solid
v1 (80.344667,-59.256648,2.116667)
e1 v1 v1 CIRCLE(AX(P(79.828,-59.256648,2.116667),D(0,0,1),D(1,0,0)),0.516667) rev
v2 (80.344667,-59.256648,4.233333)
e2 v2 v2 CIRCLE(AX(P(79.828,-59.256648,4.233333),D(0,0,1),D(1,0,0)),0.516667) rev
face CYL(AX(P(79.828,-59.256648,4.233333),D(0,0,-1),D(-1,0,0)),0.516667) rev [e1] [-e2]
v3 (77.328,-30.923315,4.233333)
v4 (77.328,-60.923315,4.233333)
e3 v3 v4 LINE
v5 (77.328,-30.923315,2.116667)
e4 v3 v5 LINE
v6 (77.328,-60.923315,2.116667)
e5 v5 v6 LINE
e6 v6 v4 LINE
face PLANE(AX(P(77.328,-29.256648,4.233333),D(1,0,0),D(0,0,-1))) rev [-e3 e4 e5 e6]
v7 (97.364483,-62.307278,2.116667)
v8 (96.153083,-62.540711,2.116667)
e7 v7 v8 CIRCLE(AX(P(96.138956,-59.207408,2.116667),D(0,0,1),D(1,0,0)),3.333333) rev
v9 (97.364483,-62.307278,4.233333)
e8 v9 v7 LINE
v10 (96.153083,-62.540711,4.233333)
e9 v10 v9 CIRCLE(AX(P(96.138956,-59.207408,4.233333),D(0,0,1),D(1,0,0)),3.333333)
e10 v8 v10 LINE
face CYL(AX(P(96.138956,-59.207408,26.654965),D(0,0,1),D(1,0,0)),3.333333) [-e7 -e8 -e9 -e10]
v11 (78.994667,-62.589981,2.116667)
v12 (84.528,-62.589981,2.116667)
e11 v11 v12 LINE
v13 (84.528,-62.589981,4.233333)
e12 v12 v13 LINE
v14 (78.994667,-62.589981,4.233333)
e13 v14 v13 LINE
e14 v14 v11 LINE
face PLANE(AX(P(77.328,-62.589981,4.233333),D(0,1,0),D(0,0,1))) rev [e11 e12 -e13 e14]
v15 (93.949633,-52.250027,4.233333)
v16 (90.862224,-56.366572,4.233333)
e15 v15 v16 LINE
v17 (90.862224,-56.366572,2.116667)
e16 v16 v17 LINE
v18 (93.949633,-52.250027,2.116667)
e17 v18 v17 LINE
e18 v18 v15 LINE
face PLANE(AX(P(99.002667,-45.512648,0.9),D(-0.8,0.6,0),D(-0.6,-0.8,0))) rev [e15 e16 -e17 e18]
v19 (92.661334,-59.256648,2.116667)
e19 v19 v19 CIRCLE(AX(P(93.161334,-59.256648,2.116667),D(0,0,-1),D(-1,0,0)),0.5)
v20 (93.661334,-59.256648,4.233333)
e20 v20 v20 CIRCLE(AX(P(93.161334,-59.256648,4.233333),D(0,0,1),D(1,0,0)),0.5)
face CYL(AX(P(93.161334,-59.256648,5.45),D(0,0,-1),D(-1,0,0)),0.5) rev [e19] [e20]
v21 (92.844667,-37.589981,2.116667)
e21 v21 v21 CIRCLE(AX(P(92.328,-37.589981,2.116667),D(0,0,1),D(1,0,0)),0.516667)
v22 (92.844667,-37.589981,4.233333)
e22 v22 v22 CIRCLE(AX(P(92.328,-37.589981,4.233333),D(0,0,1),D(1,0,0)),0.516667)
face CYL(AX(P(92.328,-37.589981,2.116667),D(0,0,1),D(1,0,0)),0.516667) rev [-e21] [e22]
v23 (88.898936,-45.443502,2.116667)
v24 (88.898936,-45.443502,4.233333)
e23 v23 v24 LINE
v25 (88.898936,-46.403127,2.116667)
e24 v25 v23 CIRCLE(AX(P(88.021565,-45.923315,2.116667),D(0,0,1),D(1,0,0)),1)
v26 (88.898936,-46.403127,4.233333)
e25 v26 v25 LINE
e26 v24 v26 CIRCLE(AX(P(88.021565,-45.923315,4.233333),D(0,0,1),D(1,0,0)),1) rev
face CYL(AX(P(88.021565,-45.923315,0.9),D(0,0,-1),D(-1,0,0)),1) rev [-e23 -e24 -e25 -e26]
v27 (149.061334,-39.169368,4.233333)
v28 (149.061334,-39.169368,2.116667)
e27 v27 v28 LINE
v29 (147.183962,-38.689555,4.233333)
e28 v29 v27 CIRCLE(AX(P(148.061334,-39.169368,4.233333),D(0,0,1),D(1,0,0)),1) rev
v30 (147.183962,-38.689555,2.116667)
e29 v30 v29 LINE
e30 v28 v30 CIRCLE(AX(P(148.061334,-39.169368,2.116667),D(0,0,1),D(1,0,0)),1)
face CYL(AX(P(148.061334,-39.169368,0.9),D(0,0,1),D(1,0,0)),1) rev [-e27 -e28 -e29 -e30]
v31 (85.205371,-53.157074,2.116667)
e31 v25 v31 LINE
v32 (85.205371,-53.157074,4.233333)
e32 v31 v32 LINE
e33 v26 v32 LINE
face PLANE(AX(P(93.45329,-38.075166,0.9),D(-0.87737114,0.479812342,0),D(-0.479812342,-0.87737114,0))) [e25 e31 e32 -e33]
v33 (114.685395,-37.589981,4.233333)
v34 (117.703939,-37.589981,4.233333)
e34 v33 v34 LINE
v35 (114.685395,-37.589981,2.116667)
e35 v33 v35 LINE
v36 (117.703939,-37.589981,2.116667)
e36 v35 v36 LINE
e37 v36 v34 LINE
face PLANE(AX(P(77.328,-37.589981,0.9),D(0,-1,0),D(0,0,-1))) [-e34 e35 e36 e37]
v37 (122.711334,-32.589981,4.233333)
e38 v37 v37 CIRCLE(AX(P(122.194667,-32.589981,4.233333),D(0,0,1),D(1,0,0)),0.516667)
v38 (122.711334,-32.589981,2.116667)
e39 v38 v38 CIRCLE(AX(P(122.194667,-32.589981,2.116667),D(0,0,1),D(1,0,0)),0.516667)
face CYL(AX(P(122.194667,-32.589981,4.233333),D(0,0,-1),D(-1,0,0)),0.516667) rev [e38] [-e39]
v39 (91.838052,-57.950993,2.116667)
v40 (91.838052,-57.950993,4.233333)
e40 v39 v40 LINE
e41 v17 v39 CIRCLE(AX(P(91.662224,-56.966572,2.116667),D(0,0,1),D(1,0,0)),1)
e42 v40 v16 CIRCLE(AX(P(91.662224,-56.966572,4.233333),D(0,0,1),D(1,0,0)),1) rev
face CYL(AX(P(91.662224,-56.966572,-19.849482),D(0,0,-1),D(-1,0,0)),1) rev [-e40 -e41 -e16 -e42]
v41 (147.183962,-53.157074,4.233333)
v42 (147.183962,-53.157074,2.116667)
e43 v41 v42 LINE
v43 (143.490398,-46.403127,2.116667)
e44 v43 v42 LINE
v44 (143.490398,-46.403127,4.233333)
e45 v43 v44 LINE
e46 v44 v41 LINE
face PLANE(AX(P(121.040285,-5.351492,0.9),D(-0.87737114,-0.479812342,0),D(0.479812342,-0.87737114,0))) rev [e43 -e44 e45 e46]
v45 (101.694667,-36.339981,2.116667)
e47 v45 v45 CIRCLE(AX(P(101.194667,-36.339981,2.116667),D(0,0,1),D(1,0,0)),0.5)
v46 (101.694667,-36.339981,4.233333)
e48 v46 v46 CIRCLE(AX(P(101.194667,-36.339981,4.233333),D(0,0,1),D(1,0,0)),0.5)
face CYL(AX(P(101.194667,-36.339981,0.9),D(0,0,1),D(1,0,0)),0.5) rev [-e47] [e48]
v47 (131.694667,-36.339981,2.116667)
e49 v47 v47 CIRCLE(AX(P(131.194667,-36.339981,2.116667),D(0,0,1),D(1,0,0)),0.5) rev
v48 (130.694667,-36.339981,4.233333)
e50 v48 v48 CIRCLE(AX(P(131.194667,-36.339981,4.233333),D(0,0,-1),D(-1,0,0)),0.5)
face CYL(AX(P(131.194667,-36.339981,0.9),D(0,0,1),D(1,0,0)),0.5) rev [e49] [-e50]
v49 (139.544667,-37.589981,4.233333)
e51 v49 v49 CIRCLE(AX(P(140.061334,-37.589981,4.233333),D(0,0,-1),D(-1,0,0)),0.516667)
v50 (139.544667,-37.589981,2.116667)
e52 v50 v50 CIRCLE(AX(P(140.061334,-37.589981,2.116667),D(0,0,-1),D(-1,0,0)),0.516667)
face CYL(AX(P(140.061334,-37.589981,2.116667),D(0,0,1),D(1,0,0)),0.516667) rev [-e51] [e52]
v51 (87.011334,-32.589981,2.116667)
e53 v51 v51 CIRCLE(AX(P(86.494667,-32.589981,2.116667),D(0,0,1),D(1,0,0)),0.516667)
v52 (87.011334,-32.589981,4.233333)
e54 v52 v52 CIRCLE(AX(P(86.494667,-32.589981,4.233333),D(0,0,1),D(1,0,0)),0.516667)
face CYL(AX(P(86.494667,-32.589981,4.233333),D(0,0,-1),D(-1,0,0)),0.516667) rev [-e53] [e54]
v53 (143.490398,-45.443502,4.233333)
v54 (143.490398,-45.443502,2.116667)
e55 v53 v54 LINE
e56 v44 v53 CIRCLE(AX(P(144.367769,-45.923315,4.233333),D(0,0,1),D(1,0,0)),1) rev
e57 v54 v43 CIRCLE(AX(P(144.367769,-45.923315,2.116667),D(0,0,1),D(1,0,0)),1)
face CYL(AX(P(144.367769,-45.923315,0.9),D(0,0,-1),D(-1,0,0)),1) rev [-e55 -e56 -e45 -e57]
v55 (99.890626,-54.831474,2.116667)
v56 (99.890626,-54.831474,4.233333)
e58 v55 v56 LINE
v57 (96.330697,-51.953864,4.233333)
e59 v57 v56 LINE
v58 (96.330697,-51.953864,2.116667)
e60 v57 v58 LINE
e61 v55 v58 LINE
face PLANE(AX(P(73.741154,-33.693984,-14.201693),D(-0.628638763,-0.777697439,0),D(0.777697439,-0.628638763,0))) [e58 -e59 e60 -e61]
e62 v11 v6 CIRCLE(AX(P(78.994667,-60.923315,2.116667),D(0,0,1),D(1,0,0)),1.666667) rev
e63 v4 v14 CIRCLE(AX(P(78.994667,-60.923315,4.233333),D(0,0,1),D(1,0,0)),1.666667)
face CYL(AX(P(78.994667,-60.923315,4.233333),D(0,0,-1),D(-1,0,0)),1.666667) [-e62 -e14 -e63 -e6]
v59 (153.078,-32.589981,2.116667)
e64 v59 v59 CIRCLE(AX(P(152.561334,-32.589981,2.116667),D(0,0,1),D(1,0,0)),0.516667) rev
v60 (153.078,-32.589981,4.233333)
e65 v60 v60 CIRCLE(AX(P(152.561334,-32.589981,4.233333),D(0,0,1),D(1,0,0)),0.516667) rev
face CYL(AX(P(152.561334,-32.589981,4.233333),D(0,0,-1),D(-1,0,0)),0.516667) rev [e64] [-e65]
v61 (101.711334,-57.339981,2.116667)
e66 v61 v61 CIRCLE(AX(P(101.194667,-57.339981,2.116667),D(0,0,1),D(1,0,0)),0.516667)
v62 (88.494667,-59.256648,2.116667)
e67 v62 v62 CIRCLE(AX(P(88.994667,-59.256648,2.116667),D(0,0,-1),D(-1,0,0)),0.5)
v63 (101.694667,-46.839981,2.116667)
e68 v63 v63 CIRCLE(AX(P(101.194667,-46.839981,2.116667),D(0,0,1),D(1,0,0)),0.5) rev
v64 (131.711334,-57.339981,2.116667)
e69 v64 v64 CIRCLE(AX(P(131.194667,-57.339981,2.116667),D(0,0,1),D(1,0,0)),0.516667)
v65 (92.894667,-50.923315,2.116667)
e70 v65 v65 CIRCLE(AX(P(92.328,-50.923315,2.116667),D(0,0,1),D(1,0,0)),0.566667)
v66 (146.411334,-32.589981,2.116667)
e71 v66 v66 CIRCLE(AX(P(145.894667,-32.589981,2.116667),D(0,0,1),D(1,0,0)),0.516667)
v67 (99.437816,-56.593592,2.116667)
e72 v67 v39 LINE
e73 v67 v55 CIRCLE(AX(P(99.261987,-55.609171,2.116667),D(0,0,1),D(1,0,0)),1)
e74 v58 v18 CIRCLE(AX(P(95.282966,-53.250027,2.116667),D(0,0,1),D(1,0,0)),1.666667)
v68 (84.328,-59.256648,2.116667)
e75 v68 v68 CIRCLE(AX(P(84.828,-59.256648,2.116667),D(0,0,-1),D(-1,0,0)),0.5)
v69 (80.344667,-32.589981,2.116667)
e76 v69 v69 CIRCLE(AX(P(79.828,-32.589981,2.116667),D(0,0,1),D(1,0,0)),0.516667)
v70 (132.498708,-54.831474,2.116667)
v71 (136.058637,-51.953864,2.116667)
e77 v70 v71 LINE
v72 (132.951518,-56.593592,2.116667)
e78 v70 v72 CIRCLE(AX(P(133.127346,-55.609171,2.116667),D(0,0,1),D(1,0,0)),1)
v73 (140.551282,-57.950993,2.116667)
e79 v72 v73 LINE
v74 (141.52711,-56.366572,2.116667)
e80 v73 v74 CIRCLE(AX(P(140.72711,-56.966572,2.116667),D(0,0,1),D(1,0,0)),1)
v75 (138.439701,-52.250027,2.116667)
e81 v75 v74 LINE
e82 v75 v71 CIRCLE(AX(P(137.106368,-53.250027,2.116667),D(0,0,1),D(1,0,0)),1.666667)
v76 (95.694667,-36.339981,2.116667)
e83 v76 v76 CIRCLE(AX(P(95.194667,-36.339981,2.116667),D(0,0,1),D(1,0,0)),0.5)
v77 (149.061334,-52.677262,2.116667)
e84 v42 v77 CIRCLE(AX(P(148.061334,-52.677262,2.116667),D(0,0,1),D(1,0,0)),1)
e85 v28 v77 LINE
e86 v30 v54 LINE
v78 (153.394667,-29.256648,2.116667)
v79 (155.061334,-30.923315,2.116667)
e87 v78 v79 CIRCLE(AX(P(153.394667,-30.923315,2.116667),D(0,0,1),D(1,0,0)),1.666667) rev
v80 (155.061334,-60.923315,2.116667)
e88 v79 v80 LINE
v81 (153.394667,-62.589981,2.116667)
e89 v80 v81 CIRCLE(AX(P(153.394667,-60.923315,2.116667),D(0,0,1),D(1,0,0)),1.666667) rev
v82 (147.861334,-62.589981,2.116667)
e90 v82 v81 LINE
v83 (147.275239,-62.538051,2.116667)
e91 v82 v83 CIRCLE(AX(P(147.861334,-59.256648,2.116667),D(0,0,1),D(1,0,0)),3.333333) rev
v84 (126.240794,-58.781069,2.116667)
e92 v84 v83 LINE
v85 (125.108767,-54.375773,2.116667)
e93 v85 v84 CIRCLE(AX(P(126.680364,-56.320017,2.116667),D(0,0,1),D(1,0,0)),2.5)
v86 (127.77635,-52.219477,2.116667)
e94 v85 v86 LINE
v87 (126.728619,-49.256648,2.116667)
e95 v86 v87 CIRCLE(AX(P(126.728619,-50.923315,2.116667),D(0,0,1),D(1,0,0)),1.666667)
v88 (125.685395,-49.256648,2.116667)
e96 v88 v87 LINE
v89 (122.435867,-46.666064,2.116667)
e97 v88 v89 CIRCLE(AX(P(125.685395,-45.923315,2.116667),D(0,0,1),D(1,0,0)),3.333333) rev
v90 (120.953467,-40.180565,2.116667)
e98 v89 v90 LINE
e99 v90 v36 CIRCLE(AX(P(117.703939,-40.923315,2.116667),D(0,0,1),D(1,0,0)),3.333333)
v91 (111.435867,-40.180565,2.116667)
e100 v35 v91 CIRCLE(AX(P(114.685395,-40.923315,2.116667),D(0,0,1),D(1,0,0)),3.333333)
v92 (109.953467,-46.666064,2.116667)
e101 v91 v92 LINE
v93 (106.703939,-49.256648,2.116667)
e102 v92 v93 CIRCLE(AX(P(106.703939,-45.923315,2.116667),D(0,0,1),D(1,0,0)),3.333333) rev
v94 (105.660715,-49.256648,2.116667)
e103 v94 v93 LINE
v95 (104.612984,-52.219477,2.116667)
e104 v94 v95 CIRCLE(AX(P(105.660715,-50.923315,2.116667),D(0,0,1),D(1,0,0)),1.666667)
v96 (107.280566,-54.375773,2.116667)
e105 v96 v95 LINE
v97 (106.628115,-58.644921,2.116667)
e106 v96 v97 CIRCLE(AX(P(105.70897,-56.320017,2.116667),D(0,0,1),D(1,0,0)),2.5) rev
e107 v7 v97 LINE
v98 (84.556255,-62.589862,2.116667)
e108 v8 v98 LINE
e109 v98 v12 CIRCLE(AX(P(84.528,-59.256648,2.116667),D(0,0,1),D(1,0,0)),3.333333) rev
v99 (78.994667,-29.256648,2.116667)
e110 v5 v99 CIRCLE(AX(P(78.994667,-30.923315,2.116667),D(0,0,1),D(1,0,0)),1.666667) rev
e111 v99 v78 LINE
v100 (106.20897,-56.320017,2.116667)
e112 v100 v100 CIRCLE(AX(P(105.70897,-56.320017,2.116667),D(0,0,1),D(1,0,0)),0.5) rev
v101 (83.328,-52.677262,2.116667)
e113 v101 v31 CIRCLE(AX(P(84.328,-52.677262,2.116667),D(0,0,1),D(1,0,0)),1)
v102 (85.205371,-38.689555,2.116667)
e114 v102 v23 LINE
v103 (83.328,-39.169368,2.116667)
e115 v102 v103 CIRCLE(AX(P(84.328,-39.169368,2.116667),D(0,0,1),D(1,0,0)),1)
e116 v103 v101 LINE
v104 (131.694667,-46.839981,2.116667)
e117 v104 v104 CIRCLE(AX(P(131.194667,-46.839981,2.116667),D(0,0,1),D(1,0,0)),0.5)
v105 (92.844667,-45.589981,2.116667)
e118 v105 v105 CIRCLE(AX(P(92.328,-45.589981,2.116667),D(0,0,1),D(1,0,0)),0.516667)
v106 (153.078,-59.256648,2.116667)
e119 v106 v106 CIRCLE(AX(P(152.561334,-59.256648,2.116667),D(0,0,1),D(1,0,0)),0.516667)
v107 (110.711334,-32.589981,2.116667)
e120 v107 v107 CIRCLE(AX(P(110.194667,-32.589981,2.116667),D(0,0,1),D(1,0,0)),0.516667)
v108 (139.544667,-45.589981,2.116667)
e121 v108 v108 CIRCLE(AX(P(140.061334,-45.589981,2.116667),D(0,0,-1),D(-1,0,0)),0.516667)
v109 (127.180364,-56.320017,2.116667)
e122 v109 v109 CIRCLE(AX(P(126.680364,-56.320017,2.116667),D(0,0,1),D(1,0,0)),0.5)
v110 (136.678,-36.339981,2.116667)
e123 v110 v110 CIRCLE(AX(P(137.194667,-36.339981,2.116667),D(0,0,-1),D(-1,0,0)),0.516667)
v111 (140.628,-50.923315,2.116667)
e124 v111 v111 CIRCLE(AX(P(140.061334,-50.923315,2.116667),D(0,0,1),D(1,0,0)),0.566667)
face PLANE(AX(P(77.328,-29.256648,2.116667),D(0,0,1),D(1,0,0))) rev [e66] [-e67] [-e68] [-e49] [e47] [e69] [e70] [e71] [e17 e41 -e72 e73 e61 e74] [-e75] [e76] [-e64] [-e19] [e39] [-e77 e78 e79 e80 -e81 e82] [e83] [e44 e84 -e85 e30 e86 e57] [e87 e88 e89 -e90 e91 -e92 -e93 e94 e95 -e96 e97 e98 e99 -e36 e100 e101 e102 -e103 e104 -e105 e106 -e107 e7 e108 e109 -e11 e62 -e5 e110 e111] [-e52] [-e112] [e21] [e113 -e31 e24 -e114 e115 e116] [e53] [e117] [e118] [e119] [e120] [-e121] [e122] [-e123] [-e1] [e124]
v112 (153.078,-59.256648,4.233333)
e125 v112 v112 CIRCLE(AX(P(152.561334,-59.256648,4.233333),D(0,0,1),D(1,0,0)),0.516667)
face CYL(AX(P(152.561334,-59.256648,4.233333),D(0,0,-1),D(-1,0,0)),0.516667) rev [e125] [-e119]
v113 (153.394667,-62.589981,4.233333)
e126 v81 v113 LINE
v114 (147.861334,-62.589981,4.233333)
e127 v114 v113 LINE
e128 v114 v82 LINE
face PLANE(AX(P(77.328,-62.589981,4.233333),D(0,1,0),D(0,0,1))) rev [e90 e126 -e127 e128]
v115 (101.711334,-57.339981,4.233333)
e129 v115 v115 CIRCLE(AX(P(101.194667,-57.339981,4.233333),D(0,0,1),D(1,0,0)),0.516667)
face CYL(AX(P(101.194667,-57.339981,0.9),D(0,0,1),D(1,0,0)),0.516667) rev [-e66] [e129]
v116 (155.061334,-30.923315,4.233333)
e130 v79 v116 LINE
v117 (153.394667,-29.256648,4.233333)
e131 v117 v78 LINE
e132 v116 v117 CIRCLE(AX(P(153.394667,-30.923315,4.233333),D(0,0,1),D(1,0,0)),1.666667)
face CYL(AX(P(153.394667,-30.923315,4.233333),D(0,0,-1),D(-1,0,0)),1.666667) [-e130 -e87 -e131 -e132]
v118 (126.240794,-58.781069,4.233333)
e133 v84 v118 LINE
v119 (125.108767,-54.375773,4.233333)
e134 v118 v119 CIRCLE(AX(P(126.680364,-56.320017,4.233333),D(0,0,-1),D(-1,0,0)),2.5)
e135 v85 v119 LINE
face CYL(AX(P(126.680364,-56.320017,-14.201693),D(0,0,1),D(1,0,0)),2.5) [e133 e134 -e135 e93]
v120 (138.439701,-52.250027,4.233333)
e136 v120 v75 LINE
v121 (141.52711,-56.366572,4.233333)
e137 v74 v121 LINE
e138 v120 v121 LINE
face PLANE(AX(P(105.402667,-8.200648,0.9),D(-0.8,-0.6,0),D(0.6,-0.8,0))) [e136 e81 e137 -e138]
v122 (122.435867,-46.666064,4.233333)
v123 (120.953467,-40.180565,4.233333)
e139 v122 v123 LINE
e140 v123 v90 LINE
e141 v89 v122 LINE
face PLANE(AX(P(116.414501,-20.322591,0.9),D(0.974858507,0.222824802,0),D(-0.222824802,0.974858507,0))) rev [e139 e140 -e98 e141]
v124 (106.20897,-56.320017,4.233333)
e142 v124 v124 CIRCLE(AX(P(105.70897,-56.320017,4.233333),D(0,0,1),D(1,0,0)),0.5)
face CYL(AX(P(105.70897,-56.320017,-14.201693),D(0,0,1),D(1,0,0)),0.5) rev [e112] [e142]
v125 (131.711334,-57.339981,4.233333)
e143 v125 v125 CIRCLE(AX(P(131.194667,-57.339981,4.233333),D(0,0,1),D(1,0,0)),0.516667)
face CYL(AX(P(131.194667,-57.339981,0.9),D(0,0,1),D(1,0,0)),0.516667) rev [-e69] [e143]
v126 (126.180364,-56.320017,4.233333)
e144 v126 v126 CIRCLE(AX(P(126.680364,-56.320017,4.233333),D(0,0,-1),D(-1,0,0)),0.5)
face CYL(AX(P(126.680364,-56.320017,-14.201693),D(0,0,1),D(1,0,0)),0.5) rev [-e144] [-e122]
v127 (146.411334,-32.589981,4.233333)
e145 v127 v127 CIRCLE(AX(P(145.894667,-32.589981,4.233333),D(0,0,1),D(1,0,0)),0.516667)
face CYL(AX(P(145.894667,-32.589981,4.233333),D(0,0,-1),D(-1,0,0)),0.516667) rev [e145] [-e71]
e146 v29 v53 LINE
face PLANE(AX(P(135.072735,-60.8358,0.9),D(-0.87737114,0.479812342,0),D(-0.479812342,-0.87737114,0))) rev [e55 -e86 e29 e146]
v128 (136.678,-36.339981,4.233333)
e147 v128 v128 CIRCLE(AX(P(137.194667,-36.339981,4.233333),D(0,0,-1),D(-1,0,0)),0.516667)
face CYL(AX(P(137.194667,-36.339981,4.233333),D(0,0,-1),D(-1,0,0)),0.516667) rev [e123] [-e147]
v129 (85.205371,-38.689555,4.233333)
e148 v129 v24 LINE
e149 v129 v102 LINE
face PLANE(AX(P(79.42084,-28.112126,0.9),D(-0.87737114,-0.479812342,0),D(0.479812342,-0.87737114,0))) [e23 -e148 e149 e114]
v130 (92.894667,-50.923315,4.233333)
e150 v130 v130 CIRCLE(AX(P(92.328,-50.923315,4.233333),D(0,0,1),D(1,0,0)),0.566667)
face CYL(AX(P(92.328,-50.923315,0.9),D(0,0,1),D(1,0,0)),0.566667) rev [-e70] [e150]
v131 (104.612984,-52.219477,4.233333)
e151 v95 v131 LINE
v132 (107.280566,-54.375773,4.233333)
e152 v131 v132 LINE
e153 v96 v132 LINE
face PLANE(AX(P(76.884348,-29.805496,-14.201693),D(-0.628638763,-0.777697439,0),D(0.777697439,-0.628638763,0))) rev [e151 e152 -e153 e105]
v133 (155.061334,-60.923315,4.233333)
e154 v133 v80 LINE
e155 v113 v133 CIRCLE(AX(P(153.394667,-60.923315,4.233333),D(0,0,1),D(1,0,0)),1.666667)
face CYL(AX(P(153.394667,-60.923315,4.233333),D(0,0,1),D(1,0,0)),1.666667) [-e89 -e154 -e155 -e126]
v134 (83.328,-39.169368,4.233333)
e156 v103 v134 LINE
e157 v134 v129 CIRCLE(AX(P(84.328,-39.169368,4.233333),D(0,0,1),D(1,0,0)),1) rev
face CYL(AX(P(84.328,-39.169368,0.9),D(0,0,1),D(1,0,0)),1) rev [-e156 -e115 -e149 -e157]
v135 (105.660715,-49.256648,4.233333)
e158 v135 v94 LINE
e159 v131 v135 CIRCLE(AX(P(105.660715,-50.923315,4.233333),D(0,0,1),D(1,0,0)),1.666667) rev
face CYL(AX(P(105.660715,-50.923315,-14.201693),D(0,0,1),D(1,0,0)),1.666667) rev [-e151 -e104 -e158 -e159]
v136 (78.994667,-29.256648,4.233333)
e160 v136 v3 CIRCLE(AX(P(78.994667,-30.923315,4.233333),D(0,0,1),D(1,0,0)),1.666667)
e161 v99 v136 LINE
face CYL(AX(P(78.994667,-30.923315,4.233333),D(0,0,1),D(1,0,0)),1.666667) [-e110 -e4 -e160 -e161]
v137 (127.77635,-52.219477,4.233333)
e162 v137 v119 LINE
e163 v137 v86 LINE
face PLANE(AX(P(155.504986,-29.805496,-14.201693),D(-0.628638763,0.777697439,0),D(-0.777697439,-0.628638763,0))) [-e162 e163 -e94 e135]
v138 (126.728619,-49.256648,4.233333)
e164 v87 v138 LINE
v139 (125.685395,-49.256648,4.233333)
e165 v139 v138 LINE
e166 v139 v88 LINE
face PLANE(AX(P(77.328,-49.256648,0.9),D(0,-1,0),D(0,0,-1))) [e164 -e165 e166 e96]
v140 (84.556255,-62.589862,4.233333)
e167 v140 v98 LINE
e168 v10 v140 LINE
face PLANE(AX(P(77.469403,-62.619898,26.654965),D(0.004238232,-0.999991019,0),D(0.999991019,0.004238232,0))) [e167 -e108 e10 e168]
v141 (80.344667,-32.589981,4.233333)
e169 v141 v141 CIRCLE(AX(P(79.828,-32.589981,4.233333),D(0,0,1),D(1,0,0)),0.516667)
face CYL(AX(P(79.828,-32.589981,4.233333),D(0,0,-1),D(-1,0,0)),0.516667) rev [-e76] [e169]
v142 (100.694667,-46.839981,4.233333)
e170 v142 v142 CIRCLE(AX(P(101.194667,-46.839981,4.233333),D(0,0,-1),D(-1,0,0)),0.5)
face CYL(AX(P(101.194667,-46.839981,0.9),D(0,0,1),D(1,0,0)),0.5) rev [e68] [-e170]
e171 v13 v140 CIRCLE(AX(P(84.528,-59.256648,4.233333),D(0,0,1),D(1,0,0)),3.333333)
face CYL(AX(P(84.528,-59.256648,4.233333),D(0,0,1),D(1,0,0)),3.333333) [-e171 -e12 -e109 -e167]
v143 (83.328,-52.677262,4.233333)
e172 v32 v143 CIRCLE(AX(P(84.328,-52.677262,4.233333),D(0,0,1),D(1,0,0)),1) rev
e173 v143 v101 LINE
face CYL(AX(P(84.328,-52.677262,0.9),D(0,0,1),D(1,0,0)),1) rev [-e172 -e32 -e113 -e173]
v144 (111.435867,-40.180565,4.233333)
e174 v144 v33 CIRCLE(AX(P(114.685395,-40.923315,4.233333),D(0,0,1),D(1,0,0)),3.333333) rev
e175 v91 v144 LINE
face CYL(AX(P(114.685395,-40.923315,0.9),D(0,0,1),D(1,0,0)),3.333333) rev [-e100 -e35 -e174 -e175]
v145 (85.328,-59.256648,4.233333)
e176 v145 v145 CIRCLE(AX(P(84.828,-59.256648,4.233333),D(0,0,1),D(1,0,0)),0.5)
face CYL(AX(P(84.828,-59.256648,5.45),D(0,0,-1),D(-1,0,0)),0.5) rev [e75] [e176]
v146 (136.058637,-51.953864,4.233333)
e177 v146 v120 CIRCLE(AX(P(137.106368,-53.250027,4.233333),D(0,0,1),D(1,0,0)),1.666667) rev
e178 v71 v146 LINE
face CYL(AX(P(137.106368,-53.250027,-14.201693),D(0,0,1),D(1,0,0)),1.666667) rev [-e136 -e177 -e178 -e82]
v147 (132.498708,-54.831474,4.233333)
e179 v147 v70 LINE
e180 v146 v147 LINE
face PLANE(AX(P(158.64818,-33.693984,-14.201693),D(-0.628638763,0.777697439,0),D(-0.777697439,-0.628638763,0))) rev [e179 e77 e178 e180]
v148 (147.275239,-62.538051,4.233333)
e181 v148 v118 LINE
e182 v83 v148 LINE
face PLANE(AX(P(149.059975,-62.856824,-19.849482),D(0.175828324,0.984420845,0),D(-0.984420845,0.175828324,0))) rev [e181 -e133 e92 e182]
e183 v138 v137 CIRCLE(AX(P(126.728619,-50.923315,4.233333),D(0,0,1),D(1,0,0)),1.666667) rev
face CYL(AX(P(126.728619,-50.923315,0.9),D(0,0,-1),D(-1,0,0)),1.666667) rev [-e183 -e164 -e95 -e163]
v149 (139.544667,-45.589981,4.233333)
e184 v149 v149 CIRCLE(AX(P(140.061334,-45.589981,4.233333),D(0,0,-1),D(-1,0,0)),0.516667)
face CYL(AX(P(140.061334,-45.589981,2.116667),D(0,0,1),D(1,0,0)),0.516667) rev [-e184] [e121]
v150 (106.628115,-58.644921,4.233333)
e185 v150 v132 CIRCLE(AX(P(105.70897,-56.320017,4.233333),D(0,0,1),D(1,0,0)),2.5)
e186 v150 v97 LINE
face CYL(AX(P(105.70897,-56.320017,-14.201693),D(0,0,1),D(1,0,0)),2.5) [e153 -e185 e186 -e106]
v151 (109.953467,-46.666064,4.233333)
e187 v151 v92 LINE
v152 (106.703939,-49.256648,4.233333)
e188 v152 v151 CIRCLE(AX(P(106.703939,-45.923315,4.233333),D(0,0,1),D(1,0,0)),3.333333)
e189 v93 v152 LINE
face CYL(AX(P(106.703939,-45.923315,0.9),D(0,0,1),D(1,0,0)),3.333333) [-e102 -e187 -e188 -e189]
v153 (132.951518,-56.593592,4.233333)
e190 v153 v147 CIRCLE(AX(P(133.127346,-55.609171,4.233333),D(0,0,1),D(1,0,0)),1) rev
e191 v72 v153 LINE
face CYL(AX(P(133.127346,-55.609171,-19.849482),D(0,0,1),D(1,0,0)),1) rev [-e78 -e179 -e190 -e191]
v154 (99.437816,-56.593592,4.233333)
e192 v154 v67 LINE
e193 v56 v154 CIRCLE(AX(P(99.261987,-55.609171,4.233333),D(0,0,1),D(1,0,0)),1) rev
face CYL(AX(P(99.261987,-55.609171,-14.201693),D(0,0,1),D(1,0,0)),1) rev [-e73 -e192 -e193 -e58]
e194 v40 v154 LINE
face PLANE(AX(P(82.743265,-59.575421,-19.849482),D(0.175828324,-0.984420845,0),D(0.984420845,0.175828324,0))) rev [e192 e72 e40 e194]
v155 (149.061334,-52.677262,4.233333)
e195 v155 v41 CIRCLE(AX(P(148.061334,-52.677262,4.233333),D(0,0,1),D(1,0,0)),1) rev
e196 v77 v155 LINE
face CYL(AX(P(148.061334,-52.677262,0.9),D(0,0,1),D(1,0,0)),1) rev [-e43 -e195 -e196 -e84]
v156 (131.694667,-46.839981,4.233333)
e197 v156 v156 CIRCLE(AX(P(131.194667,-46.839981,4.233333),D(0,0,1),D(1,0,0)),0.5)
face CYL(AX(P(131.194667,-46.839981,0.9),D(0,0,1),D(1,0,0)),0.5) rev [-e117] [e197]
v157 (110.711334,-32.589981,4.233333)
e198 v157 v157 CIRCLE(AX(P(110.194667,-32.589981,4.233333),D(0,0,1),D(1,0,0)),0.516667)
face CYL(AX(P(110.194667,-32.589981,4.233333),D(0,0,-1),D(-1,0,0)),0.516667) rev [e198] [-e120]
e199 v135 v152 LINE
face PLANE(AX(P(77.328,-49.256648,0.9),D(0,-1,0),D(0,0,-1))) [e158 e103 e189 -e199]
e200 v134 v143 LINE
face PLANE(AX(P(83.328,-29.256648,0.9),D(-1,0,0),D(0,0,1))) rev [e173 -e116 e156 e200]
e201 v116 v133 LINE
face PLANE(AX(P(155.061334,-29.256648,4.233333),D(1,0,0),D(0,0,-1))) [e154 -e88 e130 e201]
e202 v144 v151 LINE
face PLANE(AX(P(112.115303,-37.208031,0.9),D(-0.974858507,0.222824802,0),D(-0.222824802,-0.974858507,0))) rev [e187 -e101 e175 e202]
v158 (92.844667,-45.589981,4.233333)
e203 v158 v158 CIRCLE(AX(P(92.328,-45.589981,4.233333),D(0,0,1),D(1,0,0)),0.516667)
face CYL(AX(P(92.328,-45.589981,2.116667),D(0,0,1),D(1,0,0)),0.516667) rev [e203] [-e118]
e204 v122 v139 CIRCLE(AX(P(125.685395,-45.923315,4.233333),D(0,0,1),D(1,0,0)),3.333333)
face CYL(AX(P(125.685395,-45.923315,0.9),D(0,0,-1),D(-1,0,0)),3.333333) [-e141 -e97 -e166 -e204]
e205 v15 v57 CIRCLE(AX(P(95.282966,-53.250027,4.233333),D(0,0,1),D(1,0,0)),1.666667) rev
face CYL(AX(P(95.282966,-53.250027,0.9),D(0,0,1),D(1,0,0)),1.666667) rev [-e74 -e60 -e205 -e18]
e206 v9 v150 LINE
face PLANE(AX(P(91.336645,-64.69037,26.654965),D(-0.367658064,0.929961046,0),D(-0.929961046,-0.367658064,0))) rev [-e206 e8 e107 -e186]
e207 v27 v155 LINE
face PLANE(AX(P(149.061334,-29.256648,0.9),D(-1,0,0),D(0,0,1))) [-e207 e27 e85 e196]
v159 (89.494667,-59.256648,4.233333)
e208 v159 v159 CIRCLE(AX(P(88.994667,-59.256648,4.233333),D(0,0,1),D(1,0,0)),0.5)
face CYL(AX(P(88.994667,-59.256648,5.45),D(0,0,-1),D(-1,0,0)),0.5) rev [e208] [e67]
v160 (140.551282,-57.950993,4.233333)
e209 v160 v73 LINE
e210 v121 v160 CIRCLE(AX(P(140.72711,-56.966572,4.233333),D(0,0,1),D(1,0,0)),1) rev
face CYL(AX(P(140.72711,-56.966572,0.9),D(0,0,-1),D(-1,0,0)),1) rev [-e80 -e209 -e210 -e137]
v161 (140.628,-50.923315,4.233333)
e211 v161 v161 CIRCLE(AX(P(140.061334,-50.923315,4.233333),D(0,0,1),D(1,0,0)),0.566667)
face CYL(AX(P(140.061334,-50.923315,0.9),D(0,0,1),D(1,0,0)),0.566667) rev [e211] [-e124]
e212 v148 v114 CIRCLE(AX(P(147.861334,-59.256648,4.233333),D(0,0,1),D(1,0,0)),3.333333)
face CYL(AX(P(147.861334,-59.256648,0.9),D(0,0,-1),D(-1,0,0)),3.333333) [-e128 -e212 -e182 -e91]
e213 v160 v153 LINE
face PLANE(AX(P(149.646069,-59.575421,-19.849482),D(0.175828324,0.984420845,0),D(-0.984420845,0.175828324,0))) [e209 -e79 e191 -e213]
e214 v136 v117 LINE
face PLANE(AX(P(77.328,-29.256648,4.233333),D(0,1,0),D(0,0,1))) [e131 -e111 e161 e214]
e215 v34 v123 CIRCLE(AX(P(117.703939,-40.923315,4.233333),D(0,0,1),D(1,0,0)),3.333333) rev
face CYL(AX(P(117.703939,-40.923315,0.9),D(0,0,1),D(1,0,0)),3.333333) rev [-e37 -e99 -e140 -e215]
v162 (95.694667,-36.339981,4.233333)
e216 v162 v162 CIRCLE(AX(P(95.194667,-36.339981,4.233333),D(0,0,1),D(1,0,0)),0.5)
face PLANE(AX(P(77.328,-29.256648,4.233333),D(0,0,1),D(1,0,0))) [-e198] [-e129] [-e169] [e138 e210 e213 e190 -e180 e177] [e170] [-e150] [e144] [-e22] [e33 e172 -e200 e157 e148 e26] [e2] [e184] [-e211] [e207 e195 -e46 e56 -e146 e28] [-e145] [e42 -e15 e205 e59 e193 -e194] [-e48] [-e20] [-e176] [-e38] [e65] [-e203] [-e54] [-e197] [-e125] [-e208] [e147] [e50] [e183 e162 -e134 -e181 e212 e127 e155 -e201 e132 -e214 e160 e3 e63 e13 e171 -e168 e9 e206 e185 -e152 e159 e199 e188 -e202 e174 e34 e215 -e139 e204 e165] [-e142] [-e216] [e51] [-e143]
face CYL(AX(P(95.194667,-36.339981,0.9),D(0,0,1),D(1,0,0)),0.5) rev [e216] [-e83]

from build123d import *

# Parameters (mm, degrees)
SKETCH1_W           = 233.2
SKETCH1_H           = 100
SKETCH1_R           = 1.55
BOSS_EXTRUDE1_DEPTH = 6.35
FILLET1_R           = 5
SKETCH2_R           = 1.55
CUT_EXTRUDE1_DEPTH  = 6.35
SKETCH3_W           = 10
SKETCH3_H           = 12.7
BOSS_EXTRUDE2_DEPTH = 6.35
FILLET2_R           = 5
FILLET3_R           = 10
FILLET4_R           = 2
FILLET5_R           = 20
FILLET6_R           = 5
CUT_EXTRUDE2_DEPTH  = 10
SKETCH5_W           = 120
SKETCH5_H           = 40
CUT_EXTRUDE4_DEPTH  = 10
SKETCH6_R           = 1.5
CUT_EXTRUDE5_DEPTH  = 10
FILLET7_R           = 10
SKETCH7_W           = 25
SKETCH7_H           = 35
CUT_EXTRUDE6_DEPTH  = 10
FILLET9_R           = 10
SKETCH8_R           = 1.5
CUT_EXTRUDE7_DEPTH  = 10
BOSS_EXTRUDE3_START = -6.35
BOSS_EXTRUDE3_DEPTH = 6.35
FILLET10_R          = 5
BOSS_EXTRUDE4_START = -6.35
BOSS_EXTRUDE4_DEPTH = 6.35
FILLET11_R          = 3
FILLET12_R          = 3
CUT_EXTRUDE8_DEPTH  = 10
FILLET13_R          = 3
CUT_EXTRUDE9_DEPTH  = 10
SKETCH13_R          = 1.55
CUT_EXTRUDE10_DEPTH = 10
SKETCH14_R          = 1.5
CUT_EXTRUDE11_DEPTH = 10
BOSS_EXTRUDE5_START = -6.35
BOSS_EXTRUDE5_DEPTH = 6.35
FILLET14_R          = 10
SKETCH15_R          = 1.55
CUT_EXTRUDE12_DEPTH = 254.816001269
SCALE1_SCALE        = 0.333333333


# Read off the part's stored shape, not the designer's step: Boss-Extrude5
with BuildPart() as part:
    # Sketch1 → Boss-Extrude1 (new body)
    with BuildSketch(Plane.XY):
        with Locations((116.6, -50)):
            Rectangle(SKETCH1_W, SKETCH1_H)
        with Locations((7.5, -10)):
            Circle(SKETCH1_R, mode=Mode.SUBTRACT)
        with Locations((225.7, -10)):
            Circle(SKETCH1_R, mode=Mode.SUBTRACT)
        with Locations((7.5, -90)):
            Circle(SKETCH1_R, mode=Mode.SUBTRACT)
        with Locations((225.7, -90)):
            Circle(SKETCH1_R, mode=Mode.SUBTRACT)
        with Locations((27.5, -10)):
            Circle(SKETCH1_R, mode=Mode.SUBTRACT)
        with Locations((205.7, -10)):
            Circle(SKETCH1_R, mode=Mode.SUBTRACT)
        with Locations((134.6, -10)):
            Circle(SKETCH1_R, mode=Mode.SUBTRACT)
        with Locations((98.6, -10)):
            Circle(SKETCH1_R, mode=Mode.SUBTRACT)
    extrude(amount=BOSS_EXTRUDE1_DEPTH)

    # Fillet1
    fillet1_edges = [part.edges().sort_by_distance(p)[0] for p in [
        (233.2, -100, 3.175),
        (0, -100, 3.175),
        (0, 0, 3.175),
        (233.2, 0, 3.175),
    ]]
    fillet(fillet1_edges, radius=FILLET1_R)

    # Sketch2 → Cut-Extrude1 (cut)
    with BuildSketch(Plane.XY.offset(6.35)):
        with Locations((45, -25)):
            Circle(SKETCH2_R)
        with Locations((45, -49)):
            Circle(SKETCH2_R)
        with Locations(Location((188.2, -49, 0), (0, 0, 180))):
            Circle(SKETCH2_R)
        with Locations(Location((188.2, -25, 0), (0, 0, 180))):
            Circle(SKETCH2_R)
    extrude(amount=-CUT_EXTRUDE1_DEPTH, mode=Mode.SUBTRACT)

    # Sketch3 → Boss-Extrude2 (add)
    with BuildSketch(Plane.XY.offset(6.35)):
        with Locations((125.723568259, 6.35)):
            Rectangle(SKETCH3_W, SKETCH3_H)
        Polygon((120.723568259, 16.7), (120.723568259, 12.7), (130.723568259, 12.7), (130.723568259, 24.7), (85.723568259, 24.7), (85.723568259, 12.7), (95.723568259, 12.7), (95.723568259, 16.7), align=None)
        Polygon((130.723568259, 12.7), (130.723568259, 0), (152.313568259, 0), (130.723568259, 24.7), align=None)
    extrude(amount=-BOSS_EXTRUDE2_DEPTH)

    # Fillet2
    fillet2_edges = [part.edges().sort_by_distance(p)[0] for p in [
        (85.723568259, 12.7, 3.175),
    ]]
    fillet(fillet2_edges, radius=FILLET2_R)

    # Fillet3
    fillet3_edges = [part.edges().sort_by_distance(p)[0] for p in [
        (120.723568259, 0, 3.175),
    ]]
    fillet(fillet3_edges, radius=FILLET3_R)

    # Fillet4
    fillet4_edges = [part.edges().sort_by_distance(p)[0] for p in [
        (85.723568259, 24.7, 3.175),
    ]]
    fillet(fillet4_edges, radius=FILLET4_R)

    # Fillet5
    fillet5_edges = [part.edges().sort_by_distance(p)[0] for p in [
        (130.723568259, 24.7, 3.175),
        (152.313568259, 0, 3.175),
    ]]
    fillet(fillet5_edges, radius=FILLET5_R)

    # Fillet6
    fillet6_edges = [part.edges().sort_by_distance(p)[0] for p in [
        (120.723568259, 16.7, 3.175),
    ]]
    fillet(fillet6_edges, radius=FILLET6_R)

    # Sketch4 → Cut-Extrude2 (cut)
    with BuildSketch(Plane(origin=(0, 0, 0), x_dir=(-1, 0, 0), z_dir=(0, 0, -1))):
        with BuildLine():
            Line((-110.723568259, 0), (-161.395157905, 0))
            ThreePointArc((-161.395157905, 0), (-153.126132222, 1.789475179), (-146.33682816, 6.837678575))
            Line((-146.33682816, 6.837678575), (-136.700308357, 17.862321425))
            ThreePointArc((-136.700308357, 17.862321425), (-129.911004296, 22.910524821), (-121.641978613, 24.7))
            Line((-121.641978613, 24.7), (-87.723568259, 24.7))
            ThreePointArc((-87.723568259, 24.7), (-86.309354696, 24.114213562), (-85.723568259, 22.7))
            Line((-85.723568259, 22.7), (-85.723568259, 17.7))
            ThreePointArc((-85.723568259, 17.7), (-87.188034353, 14.164466094), (-90.723568259, 12.7))
            Line((-90.723568259, 12.7), (-95.723568259, 12.7))
            Line((-95.723568259, 12.7), (-95.723568259, 16.7))
            Line((-95.723568259, 16.7), (-115.723568259, 16.7))
            ThreePointArc((-115.723568259, 16.7), (-119.259102165, 15.235533906), (-120.723568259, 11.7))
            Line((-120.723568259, 11.7), (-120.723568259, 10))
            ThreePointArc((-120.723568259, 10), (-117.794636071, 2.928932188), (-110.723568259, 0))
        make_face()
    extrude(amount=-CUT_EXTRUDE2_DEPTH, mode=Mode.SUBTRACT)

    # Sketch5 → Cut-Extrude4 (cut)
    with BuildSketch(Plane.XY.offset(6.35)):
        Polygon((56.6, -100), (56.6, -60), (26.6, -100), align=None)
        with Locations((116.6, -80)):
            Rectangle(SKETCH5_W, SKETCH5_H)
        Polygon((206.6, -100), (176.6, -60), (176.6, -100), align=None)
    extrude(amount=-CUT_EXTRUDE4_DEPTH, mode=Mode.SUBTRACT)

    # Sketch6 → Cut-Extrude5 (cut)
    with BuildSketch(Plane.XY.offset(6.35)):
        with Locations((71.6, -21.25)):
            Circle(SKETCH6_R)
        with Locations((161.6, -21.25)):
            Circle(SKETCH6_R)
        with Locations((161.6, -52.75)):
            Circle(SKETCH6_R)
        with Locations((71.6, -52.75)):
            Circle(SKETCH6_R)
    extrude(amount=-CUT_EXTRUDE5_DEPTH, mode=Mode.SUBTRACT)

    # Fillet7
    fillet7_edges = [part.edges().sort_by_distance(p)[0] for p in [
        (206.6, -100, 3.175),
        (26.6, -100, 3.175),
        (56.6, -60, 3.175),
        (176.6, -60, 3.175),
    ]]
    fillet(fillet7_edges, radius=FILLET7_R)

    # Sketch7 → Cut-Extrude6 (cut)
    with BuildSketch(Plane.XY.offset(6.35)):
        Polygon((96.1, -60), (104.1, -60), (104.1, -25), align=None)
        Polygon((129.1, -25), (129.1, -60), (137.1, -60), align=None)
        with Locations((116.6, -42.5)):
            Rectangle(SKETCH7_W, SKETCH7_H)
    extrude(amount=-CUT_EXTRUDE6_DEPTH, mode=Mode.SUBTRACT)

    # Fillet9
    fillet9_edges = [part.edges().sort_by_distance(p)[0] for p in [
        (137.1, -60, 3.175),
        (96.1, -60, 3.175),
        (104.1, -25, 3.175),
        (129.1, -25, 3.175),
    ]]
    fillet(fillet9_edges, radius=FILLET9_R)

    # Sketch8 → Cut-Extrude7 (cut)
    with BuildSketch(Plane.XY.offset(6.35)):
        with Locations((53.6, -21.25)):
            Circle(SKETCH8_R)
    extrude(amount=-CUT_EXTRUDE7_DEPTH, mode=Mode.SUBTRACT)

    # Sketch9 → Boss-Extrude3 (add)
    with BuildSketch(Plane.XY.offset(6.35).offset(BOSS_EXTRUDE3_START)):
        with BuildLine():
            Line((53.6, -64), (52.97582451, -64.832233986))
            Line((52.97582451, -64.832233986), (80.428117061, -87.022837132))
            ThreePointArc((80.428117061, -87.022837132), (90.975638571, -85.904897064), (89.857698503, -75.357375554))
            Line((89.857698503, -75.357375554), (70.858883385, -60))
            Line((70.858883385, -60), (61.6, -60))
            ThreePointArc((61.6, -60), (57.127864045, -61.05572809), (53.6, -64))
        make_face()
        with BuildLine():
            ThreePointArc((83.976361625, -80.247148199), (85.642998156, -79.775924736), (86.642907782, -81.190106343))
            ThreePointArc((86.642907782, -81.190106343), (84.642817409, -82.60428795), (83.976361625, -80.247148199))
        make_face(mode=Mode.SUBTRACT)
    boss_extrude3 = extrude(amount=BOSS_EXTRUDE3_DEPTH)

    # Mirror1: Boss-Extrude3 across plane
    add(boss_extrude3.mirror(Plane.ZY.offset(-116.6)))

    # Fillet10
    fillet10_edges = [part.edges().sort_by_distance(p)[0] for p in [
        (52.97582451, -64.832233986, 3.175),
        (70.858883385, -60, 3.175),
        (180.22417549, -64.832233986, 3.175),
        (162.341116615, -60, 3.175),
    ]]
    fillet(fillet10_edges, radius=FILLET10_R)

    # Sketch10 → Boss-Extrude4 (add)
    with BuildSketch(Plane.XY.offset(6.35).offset(BOSS_EXTRUDE4_START)):
        with BuildLine():
            ThreePointArc((29.6, -96), (26.844092638, -98.514663376), (23.358283237, -99.844208453))
            Line((23.358283237, -99.844208453), (86.46162021, -88.573262682))
            ThreePointArc((86.46162021, -88.573262682), (83.276282006, -88.454107183), (80.428117061, -87.022837132))
            Line((80.428117061, -87.022837132), (72.798322589, -80.855419933))
            Line((72.798322589, -80.855419933), (36.033483436, -87.422022085))
            Line((36.033483436, -87.422022085), (29.6, -96))
        make_face()
    boss_extrude4 = extrude(amount=BOSS_EXTRUDE4_DEPTH)

    # Fillet11
    fillet11_edges = [part.edges().sort_by_distance(p)[0] for p in [
        (36.033483436, -87.422022085, 3.175),
        (72.798322589, -80.855419933, 3.175),
    ]]
    fillet(fillet11_edges, radius=FILLET11_R)

    # Mirror3: Boss-Extrude4 across plane
    add(boss_extrude4.mirror(Plane.ZY.offset(-116.6)))

    # Fillet12
    fillet12_edges = [part.edges().sort_by_distance(p)[0] for p in [
        (197.166516564, -87.422022085, 3.175),
        (160.401677411, -80.855419933, 3.175),
    ]]
    fillet(fillet12_edges, radius=FILLET12_R)

    # Sketch11 → Cut-Extrude8 (cut)
    with BuildSketch(Plane.XY.offset(6.35)):
        Polygon((35.5, -50), (18, -82), (18, -18), align=None)
        Polygon((215.2, -18), (215.2, -82), (197.7, -50), align=None)
    extrude(amount=-CUT_EXTRUDE8_DEPTH, mode=Mode.SUBTRACT)

    # Fillet13
    fillet13_edges = [part.edges().sort_by_distance(p)[0] for p in [
        (35.5, -50, 3.175),
        (18, -82, 3.175),
        (18, -18, 3.175),
        (215.2, -18, 3.175),
        (215.2, -82, 3.175),
        (197.7, -50, 3.175),
    ]]
    fillet(fillet13_edges, radius=FILLET13_R)

    # Sketch12 → Cut-Extrude9 (cut)
    with BuildSketch(Plane.XY.offset(6.35)):
        with BuildLine():
            ThreePointArc((186.5, -65), (188.2, -66.7), (189.9, -65))
            ThreePointArc((189.9, -65), (188.2, -63.3), (186.5, -65))
        make_face()
        with BuildLine():
            ThreePointArc((43.3, -65), (45, -66.7), (46.7, -65))
            ThreePointArc((46.7, -65), (45, -63.3), (43.3, -65))
        make_face()
    extrude(amount=-CUT_EXTRUDE9_DEPTH, mode=Mode.SUBTRACT)

    # Sketch13 → Cut-Extrude10 (cut)
    with BuildSketch(Plane.XY.offset(6.35)):
        with Locations((161.599999999, -84.25)):
            Circle(SKETCH13_R)
        with Locations((71.6, -84.25)):
            Circle(SKETCH13_R)
    extrude(amount=-CUT_EXTRUDE10_DEPTH, mode=Mode.SUBTRACT)

    # Sketch14 → Cut-Extrude11 (cut)
    with BuildSketch(Plane(origin=(0, 0, 0), x_dir=(-1, 0, 0), z_dir=(0, 0, -1))):
        with Locations((-22.5, -90)):
            Circle(SKETCH14_R)
        with Locations((-35, -90)):
            Circle(SKETCH14_R)
        with Locations((-47.5, -90)):
            Circle(SKETCH14_R)
    extrude(amount=-CUT_EXTRUDE11_DEPTH, mode=Mode.SUBTRACT)

    # Boss-Extrude5 outline → Boss-Extrude5 (add)
    with BuildSketch(Plane(origin=(0, 0, 0), x_dir=(-1, 0, 0), z_dir=(0, 0, -1)).offset(BOSS_EXTRUDE5_START)):
        with BuildLine():
            Line((-87.900343264, -88.164814191), (-58.358283237, -99.844208453))
            Line((-58.358283237, -99.844208453), (-21.684763887, -99.999640748))
            ThreePointArc((-21.684763887, -99.999640748), (-22.524794828, -99.957145902), (-23.358283237, -99.844208453))
            Line((-23.358283237, -99.844208453), (-86.46162021, -88.573262682))
            ThreePointArc((-86.46162021, -88.573262682), (-87.191188278, -88.404990057), (-87.900343264, -88.164814191))
        make_face()
    extrude(amount=BOSS_EXTRUDE5_DEPTH)

    # Fillet14
    fillet14_edges = [part.edges().sort_by_distance(p)[0] for p in [
        (58.358283237, -99.844208453, 3.175),
    ]]
    fillet(fillet14_edges, radius=FILLET14_R)

    # Sketch15 → Cut-Extrude12 (cut, through all)
    with BuildSketch(Plane(origin=(0, 0, 0), x_dir=(-1, 0, 0), z_dir=(0, 0, -1))):
        with Locations((-179.6, -21.25)):
            Circle(SKETCH15_R)
    extrude(amount=-CUT_EXTRUDE12_DEPTH, mode=Mode.SUBTRACT)


with BuildPart() as part_1:
    # Scale1: scaled about (115.992000253, -43.884971814, 3.175)
    add(part.part.scale(SCALE1_SCALE).moved(Location((77.328000169, -29.256647876, 2.116666667))))


solid = part_1.part
